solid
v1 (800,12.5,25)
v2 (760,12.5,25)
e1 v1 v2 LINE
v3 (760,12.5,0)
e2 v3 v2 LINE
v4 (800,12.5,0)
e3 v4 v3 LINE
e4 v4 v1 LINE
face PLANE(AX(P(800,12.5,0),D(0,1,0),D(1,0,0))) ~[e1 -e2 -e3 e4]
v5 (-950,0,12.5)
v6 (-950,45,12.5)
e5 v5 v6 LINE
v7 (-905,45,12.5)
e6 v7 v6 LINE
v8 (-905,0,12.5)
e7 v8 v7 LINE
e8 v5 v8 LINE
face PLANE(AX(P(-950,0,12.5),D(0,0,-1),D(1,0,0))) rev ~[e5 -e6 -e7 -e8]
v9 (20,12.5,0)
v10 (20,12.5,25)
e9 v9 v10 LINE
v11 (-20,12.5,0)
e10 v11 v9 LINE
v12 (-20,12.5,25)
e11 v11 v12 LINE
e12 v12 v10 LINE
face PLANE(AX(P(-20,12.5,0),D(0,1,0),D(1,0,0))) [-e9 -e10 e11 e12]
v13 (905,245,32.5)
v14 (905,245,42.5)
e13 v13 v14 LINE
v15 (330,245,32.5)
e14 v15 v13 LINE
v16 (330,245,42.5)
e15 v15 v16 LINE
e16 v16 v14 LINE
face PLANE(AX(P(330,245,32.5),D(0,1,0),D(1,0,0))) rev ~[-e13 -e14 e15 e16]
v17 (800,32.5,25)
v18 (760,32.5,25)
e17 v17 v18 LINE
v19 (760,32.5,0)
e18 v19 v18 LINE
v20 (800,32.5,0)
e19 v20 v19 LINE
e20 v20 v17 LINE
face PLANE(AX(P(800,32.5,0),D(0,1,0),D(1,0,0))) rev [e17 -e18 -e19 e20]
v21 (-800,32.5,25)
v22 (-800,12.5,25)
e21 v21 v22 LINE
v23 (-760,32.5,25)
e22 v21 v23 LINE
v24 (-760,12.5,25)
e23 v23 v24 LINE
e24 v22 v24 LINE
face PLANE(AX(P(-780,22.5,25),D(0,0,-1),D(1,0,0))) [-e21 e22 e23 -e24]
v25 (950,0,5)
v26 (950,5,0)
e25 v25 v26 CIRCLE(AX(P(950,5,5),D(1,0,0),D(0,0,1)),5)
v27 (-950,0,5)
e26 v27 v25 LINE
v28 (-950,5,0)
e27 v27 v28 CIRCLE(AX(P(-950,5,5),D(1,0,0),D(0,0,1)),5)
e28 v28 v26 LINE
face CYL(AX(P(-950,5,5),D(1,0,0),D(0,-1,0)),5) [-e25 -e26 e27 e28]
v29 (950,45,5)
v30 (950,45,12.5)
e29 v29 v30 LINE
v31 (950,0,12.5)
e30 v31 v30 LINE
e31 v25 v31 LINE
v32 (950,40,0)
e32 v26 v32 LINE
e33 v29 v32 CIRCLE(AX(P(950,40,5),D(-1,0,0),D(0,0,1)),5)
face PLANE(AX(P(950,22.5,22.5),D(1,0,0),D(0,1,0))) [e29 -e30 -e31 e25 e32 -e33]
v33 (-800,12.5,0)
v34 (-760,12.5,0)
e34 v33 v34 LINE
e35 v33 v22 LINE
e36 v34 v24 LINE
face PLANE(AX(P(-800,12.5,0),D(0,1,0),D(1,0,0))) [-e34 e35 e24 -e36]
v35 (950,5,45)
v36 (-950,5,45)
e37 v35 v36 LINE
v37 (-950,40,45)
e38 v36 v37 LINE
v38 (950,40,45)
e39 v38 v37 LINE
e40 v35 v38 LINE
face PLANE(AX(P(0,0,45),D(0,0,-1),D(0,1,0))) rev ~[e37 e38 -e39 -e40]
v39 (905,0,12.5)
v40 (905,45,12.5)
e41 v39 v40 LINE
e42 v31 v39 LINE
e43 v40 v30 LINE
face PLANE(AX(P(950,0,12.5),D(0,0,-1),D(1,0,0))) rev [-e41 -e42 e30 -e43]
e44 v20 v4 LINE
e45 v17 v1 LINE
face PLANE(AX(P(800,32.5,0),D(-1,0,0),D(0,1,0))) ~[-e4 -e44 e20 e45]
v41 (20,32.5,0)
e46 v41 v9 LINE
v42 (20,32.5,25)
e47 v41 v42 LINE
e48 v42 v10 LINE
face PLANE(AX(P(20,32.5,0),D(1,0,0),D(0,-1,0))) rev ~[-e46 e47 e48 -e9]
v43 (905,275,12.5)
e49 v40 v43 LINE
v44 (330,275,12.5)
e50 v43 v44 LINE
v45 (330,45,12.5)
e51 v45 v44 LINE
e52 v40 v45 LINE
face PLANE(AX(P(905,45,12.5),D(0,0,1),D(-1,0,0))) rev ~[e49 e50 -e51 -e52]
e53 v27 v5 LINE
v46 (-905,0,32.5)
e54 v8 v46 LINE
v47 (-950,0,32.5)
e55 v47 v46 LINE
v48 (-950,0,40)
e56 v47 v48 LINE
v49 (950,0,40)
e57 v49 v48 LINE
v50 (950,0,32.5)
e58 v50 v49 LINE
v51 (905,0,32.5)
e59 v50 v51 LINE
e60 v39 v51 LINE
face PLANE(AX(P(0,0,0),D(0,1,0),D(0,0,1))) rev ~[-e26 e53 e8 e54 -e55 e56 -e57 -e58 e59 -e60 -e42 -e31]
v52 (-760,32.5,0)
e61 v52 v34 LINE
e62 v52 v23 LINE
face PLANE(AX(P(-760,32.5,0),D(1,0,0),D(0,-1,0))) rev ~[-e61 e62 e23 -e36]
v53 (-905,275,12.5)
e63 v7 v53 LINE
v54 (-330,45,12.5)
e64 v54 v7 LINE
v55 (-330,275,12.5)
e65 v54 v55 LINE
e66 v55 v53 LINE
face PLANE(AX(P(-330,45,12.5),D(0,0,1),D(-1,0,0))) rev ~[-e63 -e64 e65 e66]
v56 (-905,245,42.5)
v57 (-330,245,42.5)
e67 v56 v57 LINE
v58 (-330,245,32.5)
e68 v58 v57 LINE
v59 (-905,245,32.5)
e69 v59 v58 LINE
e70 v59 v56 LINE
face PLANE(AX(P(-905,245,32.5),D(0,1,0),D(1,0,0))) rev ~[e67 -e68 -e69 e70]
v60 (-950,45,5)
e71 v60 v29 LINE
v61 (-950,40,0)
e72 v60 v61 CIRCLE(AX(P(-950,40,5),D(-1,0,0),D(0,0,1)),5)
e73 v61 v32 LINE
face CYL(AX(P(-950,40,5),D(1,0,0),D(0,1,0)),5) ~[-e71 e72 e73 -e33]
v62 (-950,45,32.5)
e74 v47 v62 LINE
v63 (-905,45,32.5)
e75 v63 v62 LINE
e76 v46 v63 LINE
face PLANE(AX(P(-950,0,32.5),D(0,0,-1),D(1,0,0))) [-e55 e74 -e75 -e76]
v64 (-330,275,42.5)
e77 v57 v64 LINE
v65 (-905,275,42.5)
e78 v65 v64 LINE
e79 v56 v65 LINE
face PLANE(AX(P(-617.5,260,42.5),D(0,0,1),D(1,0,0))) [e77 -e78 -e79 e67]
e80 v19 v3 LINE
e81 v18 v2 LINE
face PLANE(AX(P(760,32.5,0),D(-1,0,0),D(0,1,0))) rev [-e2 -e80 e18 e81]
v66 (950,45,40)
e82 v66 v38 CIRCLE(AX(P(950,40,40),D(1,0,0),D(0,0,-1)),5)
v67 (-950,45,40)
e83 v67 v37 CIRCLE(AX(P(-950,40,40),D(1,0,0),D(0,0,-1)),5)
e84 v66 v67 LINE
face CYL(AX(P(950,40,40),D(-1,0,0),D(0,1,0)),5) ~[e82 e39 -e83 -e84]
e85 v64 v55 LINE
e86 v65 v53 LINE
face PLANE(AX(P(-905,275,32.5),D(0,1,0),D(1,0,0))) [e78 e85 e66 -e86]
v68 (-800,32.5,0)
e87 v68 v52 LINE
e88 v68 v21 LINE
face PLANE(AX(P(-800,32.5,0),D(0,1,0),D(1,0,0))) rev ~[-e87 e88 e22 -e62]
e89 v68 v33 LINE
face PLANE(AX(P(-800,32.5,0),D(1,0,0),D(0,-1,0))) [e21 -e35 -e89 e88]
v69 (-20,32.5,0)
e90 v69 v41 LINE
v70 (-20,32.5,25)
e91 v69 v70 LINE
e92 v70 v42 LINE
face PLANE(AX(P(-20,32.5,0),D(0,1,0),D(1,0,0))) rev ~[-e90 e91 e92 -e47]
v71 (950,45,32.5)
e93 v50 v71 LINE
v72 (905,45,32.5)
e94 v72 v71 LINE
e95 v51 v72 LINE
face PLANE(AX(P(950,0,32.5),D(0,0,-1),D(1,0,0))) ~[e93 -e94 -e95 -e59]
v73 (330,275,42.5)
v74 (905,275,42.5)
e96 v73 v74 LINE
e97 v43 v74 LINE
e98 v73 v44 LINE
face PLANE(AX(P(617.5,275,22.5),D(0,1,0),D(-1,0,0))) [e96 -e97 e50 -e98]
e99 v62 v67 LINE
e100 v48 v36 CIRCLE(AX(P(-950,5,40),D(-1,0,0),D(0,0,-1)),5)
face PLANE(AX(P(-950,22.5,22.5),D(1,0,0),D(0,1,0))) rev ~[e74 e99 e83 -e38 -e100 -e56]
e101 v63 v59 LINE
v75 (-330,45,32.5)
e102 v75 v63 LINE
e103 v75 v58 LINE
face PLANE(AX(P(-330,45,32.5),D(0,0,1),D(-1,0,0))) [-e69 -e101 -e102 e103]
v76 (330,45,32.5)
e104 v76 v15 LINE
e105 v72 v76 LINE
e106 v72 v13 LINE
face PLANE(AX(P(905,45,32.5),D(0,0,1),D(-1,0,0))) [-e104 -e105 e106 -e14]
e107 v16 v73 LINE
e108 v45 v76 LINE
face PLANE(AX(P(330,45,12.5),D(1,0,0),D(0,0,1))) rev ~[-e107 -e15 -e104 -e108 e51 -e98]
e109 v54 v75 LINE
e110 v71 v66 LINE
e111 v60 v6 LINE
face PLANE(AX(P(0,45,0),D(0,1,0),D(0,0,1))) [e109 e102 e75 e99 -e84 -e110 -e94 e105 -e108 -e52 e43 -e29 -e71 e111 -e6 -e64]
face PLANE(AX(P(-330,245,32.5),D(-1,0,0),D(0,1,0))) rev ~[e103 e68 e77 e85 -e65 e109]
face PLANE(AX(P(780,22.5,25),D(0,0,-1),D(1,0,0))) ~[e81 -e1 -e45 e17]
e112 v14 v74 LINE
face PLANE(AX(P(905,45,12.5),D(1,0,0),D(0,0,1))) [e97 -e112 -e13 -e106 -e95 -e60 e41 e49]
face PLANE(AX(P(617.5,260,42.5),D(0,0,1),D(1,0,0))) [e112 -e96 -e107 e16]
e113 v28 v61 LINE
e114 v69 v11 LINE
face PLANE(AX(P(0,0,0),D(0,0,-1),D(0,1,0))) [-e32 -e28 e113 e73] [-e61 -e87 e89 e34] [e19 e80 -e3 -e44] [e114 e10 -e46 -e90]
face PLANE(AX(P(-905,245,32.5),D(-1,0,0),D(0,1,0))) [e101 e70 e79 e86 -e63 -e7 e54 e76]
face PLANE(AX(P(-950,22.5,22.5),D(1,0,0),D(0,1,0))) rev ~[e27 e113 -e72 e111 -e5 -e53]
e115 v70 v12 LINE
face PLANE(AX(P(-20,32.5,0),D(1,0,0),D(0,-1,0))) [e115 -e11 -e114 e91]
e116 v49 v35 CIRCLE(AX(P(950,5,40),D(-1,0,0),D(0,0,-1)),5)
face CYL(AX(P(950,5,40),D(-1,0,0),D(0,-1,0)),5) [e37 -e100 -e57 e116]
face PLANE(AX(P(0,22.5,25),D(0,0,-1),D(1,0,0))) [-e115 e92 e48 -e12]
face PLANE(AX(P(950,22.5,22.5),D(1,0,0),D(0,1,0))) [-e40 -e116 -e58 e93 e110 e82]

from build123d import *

# Parameters (mm, degrees)
F0_W      = 45
F0_H      = 45
F1_DEPTH  = 950
F2_R      = 5
F3_W      = 45
F3_H      = 20
F4_DEPTH  = 45.001
F5_W      = 40
F5_H      = 20
F6_DEPTH  = 25
F7_W      = 40
F7_H      = 20
F8_DEPTH  = 25
F9_W      = 575
F9_H      = 20
F10_DEPTH = 230
F11_W     = 575
F11_H     = 30
F12_DEPTH = 10


# Not quite as in the source:
# - a pattern or mirror of a feature is missing from the dataset's text; its kind, count and spacing are read off the source's solid


with BuildPart() as f1:
    # F0 (on Right) → F1 (new body, symmetric)
    with BuildSketch(Plane.YZ):
        with Locations((22.5, 22.5)):
            Rectangle(F0_W, F0_H)
    extrude(amount=F1_DEPTH, both=True)

    # F2
    f2_edges = [f1.edges().sort_by_distance(p)[0] for p in [
        (0, 0, 45),
        (0, 45, 45),
        (0, 0, 0),
        (0, 45, 0),
    ]]
    fillet(f2_edges, radius=F2_R)

    # F3 (on face) → F4 (cut, through all)
    with BuildSketch(Plane.XZ):
        with Locations((-927.5, 22.5)):
            Rectangle(F3_W, F3_H)
    f4 = extrude(amount=-F4_DEPTH, mode=Mode.SUBTRACT)

    # F4_copies: F4 across plane
    add(f4.mirror(Plane(origin=(0, 0, 0), x_dir=(0, 0, 1), z_dir=(1, 0, 0))), mode=Mode.SUBTRACT)

    # F5 (on face) → F6 (cut)
    with BuildSketch(Plane(origin=(0, 0, 0), x_dir=(1, 0, 0), z_dir=(0, 0, -1))):
        with Locations((-780, -22.5)):
            Rectangle(F5_W, F5_H)
    f6 = extrude(amount=-F6_DEPTH, mode=Mode.SUBTRACT)

    # F6_copies: F6 across plane
    add(f6.mirror(Plane(origin=(0, 0, 0), x_dir=(0, 0, 1), z_dir=(1, 0, 0))), mode=Mode.SUBTRACT)

    # F7 (on face) → F8 (cut)
    with BuildSketch(Plane(origin=(0, 0, 0), x_dir=(1, 0, 0), z_dir=(0, 0, -1))):
        with Locations((0, -22.5)):
            Rectangle(F7_W, F7_H)
    extrude(amount=-F8_DEPTH, mode=Mode.SUBTRACT)

    # F9 (on face) → F10 (join)
    with BuildSketch(Plane(origin=(0, 45, 0), x_dir=(-1, 0, 0), z_dir=(0, 1, 0))):
        with Locations((-617.5, 22.5)):
            Rectangle(F9_W, F9_H)
        with Locations((617.5, 22.5)):
            Rectangle(F9_W, F9_H)
    extrude(amount=F10_DEPTH)

    # F11 (on face) → F12 (join)
    with BuildSketch(Plane.XY.offset(32.5)):
        with Locations((-617.5, 260)):
            Rectangle(F11_W, F11_H)
        with Locations((617.5, 260)):
            Rectangle(F11_W, F11_H)
    extrude(amount=F12_DEPTH)


solid = f1.part
